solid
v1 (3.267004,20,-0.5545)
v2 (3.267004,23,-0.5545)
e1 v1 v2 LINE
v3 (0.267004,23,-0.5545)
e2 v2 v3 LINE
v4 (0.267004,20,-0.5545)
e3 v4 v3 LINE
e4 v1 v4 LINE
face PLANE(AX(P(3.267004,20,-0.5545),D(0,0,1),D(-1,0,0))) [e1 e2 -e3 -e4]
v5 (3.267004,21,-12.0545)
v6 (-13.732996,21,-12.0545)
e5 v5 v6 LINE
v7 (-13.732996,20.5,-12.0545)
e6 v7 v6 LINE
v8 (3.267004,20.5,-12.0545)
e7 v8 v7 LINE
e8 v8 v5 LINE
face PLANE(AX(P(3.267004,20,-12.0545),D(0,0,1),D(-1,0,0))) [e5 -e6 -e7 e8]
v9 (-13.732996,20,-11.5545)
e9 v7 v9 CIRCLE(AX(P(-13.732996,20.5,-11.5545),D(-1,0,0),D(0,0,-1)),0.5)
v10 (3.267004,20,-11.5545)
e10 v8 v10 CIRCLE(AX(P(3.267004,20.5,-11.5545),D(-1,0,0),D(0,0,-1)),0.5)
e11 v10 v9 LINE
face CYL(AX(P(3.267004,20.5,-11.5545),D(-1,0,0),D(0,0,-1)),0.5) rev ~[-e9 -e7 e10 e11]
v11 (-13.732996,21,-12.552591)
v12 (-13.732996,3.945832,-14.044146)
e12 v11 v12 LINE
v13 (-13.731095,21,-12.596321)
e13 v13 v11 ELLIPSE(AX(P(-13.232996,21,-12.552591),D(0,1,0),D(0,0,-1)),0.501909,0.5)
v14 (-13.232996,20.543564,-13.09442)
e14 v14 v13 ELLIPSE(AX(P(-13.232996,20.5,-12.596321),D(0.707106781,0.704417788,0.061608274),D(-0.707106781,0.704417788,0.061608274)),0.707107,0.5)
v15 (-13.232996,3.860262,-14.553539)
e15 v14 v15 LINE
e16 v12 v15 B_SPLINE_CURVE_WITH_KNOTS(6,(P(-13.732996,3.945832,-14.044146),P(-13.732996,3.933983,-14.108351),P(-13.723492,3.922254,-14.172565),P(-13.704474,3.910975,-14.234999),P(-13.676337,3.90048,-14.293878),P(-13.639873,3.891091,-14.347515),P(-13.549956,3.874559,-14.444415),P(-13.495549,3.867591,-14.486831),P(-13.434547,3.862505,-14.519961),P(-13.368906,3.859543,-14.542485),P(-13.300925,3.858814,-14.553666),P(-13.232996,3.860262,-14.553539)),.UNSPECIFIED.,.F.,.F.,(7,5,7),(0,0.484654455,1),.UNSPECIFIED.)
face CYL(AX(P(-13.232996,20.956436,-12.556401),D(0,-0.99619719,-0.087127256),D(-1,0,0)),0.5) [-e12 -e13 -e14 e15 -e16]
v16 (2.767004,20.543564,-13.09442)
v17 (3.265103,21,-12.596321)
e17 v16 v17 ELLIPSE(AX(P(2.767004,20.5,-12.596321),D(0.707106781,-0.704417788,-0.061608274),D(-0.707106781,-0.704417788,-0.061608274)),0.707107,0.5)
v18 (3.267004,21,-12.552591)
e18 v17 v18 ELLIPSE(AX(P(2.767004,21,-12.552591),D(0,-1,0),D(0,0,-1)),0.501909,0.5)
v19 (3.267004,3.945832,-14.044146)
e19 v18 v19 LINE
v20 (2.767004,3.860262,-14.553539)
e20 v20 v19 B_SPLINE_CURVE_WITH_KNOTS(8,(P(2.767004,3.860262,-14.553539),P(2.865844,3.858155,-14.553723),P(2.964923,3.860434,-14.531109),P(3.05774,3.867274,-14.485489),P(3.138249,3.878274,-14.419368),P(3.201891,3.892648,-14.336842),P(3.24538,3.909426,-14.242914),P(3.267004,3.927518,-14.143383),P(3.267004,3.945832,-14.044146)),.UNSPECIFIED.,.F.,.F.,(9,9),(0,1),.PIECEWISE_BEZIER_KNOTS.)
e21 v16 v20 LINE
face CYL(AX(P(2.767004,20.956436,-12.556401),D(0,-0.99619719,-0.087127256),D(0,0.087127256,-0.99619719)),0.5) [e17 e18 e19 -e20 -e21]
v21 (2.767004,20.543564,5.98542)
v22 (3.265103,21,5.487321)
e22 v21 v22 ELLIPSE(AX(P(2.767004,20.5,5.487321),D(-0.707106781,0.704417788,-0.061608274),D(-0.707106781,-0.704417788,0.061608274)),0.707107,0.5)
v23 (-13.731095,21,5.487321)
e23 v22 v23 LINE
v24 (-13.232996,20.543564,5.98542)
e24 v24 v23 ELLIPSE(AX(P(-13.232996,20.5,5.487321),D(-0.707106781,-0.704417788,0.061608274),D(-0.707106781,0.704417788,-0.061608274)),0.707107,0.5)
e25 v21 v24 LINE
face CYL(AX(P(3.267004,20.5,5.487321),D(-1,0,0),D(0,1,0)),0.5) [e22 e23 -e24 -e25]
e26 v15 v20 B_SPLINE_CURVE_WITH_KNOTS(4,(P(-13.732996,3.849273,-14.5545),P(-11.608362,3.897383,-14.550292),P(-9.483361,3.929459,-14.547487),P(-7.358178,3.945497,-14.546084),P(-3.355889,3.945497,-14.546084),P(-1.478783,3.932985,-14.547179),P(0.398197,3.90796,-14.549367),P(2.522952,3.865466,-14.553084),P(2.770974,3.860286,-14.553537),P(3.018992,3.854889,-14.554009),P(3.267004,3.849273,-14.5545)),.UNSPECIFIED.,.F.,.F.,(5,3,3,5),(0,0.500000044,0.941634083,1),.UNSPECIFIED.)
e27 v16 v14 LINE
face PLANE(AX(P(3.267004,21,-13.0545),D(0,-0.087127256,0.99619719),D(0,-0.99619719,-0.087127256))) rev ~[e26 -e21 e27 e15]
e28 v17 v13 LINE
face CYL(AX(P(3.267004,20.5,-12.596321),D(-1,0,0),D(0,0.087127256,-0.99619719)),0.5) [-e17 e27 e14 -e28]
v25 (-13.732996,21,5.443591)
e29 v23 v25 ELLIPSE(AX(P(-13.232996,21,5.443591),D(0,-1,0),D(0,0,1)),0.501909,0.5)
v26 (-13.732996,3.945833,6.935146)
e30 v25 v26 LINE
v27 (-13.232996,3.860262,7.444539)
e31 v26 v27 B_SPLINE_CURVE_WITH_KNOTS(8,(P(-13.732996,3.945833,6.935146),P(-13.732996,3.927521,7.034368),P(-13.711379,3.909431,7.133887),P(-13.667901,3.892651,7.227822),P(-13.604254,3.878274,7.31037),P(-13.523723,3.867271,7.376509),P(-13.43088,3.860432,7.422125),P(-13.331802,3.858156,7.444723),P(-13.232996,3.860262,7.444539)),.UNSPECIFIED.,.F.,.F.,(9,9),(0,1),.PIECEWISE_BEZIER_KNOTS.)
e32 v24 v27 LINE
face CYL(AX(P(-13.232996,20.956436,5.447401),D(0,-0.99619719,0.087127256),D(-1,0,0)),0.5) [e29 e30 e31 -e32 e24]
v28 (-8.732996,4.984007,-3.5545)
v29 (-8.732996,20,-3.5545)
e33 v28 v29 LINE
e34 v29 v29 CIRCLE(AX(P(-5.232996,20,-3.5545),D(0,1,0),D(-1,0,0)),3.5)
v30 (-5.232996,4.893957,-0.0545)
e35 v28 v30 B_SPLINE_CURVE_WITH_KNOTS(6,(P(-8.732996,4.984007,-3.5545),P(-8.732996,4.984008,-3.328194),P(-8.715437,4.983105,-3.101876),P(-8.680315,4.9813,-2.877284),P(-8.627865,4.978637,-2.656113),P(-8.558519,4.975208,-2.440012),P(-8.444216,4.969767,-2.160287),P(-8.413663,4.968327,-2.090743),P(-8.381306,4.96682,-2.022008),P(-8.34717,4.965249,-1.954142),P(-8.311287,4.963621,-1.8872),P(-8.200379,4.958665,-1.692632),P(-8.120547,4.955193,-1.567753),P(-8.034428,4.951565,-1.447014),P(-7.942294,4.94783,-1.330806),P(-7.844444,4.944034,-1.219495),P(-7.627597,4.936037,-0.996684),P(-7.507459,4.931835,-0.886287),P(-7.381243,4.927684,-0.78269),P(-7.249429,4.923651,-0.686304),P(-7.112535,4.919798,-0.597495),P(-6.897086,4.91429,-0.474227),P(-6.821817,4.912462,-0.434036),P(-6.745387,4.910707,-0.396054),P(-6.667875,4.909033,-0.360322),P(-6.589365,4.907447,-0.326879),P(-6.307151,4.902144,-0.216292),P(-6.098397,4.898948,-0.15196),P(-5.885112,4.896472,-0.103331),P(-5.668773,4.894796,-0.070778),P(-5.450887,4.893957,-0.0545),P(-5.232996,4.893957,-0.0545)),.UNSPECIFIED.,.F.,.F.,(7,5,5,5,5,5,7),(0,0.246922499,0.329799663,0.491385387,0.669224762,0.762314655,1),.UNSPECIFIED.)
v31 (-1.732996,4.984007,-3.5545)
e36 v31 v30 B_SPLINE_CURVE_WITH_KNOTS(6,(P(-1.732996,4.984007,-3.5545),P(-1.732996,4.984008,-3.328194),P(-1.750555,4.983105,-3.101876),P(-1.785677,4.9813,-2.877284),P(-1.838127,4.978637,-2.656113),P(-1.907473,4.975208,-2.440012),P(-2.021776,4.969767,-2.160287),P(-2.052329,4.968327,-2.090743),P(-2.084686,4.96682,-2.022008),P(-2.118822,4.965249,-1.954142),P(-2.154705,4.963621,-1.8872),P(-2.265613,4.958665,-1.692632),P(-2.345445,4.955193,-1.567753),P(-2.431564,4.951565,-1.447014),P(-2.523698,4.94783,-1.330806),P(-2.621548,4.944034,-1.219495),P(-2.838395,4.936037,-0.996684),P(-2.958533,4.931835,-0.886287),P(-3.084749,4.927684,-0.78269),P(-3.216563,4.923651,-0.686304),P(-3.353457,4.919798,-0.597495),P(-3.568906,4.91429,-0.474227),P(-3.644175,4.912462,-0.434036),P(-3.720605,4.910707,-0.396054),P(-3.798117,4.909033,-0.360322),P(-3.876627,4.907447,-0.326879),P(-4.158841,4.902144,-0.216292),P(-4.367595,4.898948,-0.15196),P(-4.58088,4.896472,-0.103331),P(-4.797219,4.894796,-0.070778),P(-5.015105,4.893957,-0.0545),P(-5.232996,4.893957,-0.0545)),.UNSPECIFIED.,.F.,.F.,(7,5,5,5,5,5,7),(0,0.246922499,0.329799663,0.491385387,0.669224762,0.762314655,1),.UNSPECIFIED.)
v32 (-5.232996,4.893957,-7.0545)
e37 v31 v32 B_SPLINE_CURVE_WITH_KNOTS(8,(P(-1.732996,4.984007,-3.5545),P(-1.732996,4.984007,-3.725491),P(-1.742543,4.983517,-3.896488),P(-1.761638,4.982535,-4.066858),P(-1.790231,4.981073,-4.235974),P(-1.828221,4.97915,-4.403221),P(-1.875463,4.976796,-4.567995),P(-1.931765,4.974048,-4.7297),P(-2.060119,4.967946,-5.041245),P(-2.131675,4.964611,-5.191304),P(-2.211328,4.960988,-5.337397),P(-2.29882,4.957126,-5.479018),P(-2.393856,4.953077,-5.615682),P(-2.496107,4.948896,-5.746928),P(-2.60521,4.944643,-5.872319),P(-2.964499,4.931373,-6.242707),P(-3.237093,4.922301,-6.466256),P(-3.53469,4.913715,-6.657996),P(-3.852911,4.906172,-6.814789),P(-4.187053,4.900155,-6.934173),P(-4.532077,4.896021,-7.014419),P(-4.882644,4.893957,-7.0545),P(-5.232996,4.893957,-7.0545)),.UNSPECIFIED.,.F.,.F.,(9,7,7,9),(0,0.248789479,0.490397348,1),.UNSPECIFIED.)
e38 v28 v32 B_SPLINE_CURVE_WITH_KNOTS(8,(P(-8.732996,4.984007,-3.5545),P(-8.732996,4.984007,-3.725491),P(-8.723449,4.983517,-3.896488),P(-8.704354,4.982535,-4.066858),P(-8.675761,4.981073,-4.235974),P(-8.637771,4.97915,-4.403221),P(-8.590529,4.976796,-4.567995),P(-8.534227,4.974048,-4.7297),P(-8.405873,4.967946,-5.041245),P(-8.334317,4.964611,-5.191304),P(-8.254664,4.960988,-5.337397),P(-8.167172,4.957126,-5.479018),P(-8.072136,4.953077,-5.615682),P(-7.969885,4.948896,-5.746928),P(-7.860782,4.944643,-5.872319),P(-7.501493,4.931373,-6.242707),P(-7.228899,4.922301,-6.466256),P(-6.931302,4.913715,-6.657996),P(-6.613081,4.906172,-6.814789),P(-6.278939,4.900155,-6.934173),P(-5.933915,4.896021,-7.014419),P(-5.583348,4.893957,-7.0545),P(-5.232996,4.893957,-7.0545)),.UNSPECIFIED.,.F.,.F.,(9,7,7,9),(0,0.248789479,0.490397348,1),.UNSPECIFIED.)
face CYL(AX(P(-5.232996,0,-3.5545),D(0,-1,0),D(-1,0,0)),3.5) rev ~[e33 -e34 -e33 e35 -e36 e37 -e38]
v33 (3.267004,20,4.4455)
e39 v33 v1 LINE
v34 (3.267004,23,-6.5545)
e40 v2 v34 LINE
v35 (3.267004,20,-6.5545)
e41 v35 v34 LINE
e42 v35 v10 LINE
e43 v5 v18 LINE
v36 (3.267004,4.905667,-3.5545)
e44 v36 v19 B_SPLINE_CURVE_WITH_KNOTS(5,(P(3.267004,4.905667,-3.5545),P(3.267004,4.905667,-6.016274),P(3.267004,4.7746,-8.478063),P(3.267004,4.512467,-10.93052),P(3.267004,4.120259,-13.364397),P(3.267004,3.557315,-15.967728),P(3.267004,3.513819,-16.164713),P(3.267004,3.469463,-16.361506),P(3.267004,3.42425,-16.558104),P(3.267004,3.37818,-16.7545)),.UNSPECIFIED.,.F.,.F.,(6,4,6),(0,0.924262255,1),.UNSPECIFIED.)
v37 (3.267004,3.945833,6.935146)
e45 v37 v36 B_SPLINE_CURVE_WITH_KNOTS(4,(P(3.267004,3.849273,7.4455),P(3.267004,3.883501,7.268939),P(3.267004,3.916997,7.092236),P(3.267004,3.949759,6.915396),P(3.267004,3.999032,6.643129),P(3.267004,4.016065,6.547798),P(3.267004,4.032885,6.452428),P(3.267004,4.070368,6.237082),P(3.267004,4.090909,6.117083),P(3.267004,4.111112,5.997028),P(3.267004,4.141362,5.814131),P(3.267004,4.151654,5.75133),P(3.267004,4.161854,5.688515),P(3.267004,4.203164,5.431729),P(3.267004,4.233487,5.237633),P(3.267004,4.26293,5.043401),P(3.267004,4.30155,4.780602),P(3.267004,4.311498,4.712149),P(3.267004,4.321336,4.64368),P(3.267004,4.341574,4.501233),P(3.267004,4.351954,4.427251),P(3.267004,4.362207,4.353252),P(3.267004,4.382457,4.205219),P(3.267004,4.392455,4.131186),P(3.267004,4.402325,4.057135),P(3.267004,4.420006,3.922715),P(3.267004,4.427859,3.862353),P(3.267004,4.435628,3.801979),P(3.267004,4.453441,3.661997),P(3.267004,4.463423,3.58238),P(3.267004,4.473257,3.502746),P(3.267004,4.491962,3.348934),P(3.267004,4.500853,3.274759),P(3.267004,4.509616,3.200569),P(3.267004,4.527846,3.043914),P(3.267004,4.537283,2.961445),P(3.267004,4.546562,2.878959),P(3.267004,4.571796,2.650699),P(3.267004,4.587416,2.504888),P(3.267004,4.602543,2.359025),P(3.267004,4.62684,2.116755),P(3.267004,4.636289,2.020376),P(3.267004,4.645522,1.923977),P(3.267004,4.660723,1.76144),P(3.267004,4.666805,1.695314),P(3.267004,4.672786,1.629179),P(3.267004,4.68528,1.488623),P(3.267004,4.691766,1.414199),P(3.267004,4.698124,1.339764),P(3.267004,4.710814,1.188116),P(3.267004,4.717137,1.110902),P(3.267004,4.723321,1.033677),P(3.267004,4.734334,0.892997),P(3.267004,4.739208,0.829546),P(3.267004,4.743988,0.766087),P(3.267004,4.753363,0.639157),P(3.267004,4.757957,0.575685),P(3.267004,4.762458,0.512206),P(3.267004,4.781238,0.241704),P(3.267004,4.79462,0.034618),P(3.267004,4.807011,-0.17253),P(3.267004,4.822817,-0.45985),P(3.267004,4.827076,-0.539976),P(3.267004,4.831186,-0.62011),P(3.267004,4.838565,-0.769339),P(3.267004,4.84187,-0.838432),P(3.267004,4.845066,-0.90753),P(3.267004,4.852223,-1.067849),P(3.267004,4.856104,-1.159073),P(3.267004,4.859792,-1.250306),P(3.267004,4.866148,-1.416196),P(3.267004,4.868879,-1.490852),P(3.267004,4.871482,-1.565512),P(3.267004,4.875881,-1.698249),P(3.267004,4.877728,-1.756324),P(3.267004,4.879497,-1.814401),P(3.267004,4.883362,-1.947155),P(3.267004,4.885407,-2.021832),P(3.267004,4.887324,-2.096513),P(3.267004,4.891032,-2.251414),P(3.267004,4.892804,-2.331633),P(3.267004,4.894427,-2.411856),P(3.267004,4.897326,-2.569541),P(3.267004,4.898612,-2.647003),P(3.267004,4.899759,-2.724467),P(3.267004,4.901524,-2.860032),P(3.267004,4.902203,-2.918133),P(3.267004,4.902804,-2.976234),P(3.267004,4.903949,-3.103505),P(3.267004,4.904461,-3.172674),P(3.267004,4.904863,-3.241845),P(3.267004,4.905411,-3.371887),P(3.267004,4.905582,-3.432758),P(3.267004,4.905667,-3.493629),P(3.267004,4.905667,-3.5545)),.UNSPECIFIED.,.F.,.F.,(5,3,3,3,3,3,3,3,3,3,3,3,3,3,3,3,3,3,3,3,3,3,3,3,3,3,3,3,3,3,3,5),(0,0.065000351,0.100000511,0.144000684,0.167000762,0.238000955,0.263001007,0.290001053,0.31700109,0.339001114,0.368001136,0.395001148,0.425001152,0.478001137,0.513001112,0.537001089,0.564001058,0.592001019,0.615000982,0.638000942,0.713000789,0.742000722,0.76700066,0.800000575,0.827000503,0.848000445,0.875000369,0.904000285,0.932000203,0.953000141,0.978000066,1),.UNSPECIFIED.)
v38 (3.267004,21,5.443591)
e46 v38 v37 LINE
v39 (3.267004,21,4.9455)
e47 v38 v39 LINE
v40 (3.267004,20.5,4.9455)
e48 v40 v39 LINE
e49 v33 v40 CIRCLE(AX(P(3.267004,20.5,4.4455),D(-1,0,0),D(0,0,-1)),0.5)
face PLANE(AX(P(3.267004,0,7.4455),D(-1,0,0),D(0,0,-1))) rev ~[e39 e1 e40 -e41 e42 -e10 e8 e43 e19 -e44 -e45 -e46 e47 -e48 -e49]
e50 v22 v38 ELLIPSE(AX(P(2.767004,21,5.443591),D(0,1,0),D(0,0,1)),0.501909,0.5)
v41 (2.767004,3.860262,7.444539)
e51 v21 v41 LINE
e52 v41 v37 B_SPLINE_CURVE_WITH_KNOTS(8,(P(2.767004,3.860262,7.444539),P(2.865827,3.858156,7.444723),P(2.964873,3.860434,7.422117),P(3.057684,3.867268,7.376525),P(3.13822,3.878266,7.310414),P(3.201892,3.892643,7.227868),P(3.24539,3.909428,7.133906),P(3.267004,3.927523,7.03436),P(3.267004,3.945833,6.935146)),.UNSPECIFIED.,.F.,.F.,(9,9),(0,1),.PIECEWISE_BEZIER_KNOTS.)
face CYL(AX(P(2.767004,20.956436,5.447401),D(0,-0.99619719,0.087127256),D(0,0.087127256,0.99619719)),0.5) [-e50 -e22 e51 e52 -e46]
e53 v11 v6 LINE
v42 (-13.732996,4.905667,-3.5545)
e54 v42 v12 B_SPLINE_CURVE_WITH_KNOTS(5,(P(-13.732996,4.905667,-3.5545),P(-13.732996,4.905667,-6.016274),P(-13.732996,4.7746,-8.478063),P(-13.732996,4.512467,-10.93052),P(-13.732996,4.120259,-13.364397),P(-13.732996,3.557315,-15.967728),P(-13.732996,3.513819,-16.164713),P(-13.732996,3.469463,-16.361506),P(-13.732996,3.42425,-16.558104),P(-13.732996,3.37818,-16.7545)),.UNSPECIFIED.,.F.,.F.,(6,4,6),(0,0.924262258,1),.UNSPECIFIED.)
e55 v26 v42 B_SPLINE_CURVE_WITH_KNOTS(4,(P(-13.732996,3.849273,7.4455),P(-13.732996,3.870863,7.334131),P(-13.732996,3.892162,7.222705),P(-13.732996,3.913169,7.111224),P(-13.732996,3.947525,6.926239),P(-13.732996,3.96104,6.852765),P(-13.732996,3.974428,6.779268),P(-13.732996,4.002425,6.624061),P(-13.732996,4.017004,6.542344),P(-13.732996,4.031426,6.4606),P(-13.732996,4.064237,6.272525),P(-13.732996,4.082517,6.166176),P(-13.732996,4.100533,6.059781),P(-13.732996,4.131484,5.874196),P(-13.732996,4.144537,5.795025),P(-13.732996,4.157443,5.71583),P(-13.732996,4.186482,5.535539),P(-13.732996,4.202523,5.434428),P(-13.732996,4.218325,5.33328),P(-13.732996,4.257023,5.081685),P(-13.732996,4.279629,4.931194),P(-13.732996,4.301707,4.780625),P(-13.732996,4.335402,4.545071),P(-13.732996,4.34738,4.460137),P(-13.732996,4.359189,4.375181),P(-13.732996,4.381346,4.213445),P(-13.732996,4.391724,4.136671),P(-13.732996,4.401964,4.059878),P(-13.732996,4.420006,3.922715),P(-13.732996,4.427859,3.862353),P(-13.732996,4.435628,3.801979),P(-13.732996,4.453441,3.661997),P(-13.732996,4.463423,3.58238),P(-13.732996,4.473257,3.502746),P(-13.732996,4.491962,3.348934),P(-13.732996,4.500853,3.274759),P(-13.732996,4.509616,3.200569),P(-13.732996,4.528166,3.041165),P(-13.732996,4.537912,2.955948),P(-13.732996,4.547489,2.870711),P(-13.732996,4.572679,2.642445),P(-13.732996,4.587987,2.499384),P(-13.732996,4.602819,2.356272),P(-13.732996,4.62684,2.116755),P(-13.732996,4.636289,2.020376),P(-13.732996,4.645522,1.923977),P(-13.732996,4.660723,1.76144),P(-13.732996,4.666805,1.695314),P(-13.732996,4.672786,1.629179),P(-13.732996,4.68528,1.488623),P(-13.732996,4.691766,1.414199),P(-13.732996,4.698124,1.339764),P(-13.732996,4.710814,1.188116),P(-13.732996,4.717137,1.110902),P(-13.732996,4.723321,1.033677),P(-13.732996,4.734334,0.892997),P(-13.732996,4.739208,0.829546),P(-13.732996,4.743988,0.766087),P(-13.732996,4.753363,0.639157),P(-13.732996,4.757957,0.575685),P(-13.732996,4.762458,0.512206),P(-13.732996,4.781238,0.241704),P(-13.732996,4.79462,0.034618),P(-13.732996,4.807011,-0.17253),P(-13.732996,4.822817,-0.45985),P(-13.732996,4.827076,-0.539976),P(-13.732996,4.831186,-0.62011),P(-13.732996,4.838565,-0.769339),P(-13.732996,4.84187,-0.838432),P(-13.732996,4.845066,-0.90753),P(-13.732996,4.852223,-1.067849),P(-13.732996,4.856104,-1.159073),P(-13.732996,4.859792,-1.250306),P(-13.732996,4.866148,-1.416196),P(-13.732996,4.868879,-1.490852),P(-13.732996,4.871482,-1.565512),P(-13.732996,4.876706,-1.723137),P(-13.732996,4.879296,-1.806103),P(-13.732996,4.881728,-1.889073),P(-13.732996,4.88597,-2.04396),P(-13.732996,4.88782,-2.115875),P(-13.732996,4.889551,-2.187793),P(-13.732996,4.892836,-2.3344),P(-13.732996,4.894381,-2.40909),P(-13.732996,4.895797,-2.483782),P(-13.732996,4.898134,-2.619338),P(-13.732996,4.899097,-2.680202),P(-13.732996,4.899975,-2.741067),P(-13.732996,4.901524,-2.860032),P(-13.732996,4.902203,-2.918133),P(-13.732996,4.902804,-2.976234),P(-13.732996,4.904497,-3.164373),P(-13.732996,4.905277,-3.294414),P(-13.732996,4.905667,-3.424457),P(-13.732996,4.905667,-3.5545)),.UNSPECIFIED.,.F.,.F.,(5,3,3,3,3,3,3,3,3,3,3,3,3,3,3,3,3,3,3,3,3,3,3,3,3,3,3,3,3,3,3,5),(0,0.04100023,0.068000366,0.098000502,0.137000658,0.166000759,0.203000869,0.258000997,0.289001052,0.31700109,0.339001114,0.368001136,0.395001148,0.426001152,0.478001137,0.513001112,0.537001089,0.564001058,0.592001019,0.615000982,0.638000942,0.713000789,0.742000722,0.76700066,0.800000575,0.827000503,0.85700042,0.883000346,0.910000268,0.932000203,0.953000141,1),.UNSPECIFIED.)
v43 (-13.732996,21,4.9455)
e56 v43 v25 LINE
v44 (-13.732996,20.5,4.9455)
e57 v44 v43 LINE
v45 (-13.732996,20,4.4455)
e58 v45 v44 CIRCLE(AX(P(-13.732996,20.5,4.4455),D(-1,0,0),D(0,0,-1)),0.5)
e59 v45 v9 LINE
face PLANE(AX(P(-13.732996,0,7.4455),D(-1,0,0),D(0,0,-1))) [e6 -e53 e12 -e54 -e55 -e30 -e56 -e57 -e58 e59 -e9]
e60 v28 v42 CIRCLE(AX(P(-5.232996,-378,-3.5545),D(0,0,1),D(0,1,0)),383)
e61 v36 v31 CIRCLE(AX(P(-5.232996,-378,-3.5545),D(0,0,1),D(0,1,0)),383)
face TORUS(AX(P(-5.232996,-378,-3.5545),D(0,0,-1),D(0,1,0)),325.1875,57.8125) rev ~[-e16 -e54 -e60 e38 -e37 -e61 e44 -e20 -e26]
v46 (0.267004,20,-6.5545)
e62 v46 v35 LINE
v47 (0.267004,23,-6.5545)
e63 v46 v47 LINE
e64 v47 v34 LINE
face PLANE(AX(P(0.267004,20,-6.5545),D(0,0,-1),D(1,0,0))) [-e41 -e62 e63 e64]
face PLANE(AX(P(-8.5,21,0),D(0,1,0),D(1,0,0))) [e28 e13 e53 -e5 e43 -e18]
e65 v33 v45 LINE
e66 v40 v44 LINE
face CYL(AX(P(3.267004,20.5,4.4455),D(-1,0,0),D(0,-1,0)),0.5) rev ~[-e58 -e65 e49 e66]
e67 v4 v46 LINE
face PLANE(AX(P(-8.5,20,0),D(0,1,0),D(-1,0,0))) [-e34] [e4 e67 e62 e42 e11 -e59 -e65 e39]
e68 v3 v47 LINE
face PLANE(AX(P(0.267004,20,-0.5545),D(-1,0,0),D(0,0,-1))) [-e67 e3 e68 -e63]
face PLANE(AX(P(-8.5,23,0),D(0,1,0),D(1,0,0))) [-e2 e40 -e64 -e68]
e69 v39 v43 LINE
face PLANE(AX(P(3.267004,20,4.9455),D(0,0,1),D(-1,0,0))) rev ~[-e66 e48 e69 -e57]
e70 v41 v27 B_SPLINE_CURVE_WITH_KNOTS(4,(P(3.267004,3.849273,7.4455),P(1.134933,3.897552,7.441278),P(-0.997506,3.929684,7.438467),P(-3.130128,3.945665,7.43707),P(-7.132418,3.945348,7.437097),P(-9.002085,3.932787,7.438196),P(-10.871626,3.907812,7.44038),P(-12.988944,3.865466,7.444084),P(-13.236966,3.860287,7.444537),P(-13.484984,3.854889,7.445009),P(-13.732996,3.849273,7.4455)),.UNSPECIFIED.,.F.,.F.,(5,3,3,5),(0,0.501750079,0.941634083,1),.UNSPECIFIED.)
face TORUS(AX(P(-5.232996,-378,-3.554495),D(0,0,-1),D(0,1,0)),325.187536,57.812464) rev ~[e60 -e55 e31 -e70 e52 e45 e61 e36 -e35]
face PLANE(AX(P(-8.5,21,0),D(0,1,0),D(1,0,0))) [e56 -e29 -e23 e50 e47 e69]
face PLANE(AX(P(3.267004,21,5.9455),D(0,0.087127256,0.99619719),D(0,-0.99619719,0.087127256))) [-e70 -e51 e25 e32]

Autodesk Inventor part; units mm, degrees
ref_plane "YZ Plane" through (0, 0, 0) normal (1, 0, 0) x (0, 1, 0)
ref_plane "XZ Plane" through (0, 0, 0) normal (0, 1, 0) x (-1, 0, 0)
ref_plane "XY Plane" through (0, 0, 0) normal (0, 0, 1) x (1, 0, 0)
sketch "Sketch1" plane through (0, 0, 0) normal (0, 1, 0) x (-1, 0, 0)
  line L0 (5.232996, 7.4455) -> (-11.767004, 7.4455)
  line L1 (-11.767004, 7.4455) -> (-11.767004, -14.5545)
  line L2 (-11.767004, -14.5545) -> (5.232996, -14.5545)
  circle A0 centre (-3.267004, -3.5545) radius 3.5
  line L3 (5.232996, 7.4455) -> (5.232996, -14.5545)
  point P0 (0, 0)
  dimension "d2" = 22
  dimension "d3" = 17
  dimension "d8" = 7
  dimension "d10" = 11
  dimension "d11" = 8.5
extrude "Extrusion1" add sketch "Sketch1" along normal blind 20
sketch "Sketch2" plane through (0, 20, 0) normal (0, 1, 0) x (1, 0, 0)
  line L0 (-5.232996, -7.4455) -> (11.767004, -7.4455)
  line L1 (11.767004, -7.4455) -> (11.767004, 14.5545)
  line L2 (-5.232996, -7.4455) -> (11.767004, -7.4455)
  line L3 (11.767004, -7.4455) -> (11.767004, -4.9455)
  line L4 (11.767004, -4.9455) -> (-5.232996, -4.9455)
  line L5 (-5.232996, -4.9455) -> (-5.232996, -7.4455)
  line L6 (-5.232996, 14.5545) -> (-5.232996, -7.4455)
  line L7 (-5.232996, 14.5545) -> (11.767004, 14.5545)
  line L8 (11.767004, 14.5545) -> (11.767004, 12.0545)
  line L9 (11.767004, 12.0545) -> (-5.232996, 12.0545)
  line L10 (-5.232996, 12.0545) -> (-5.232996, 14.5545)
  line L11 (11.767004, 0.5545) -> (8.767004, 0.5545)
  line L12 (8.767004, 0.5545) -> (8.767004, 6.5545)
  line L13 (8.767004, 6.5545) -> (11.767004, 6.5545)
  line L14 (11.767004, 6.5545) -> (11.767004, 0.5545)
  line L15 (11.767004, 0.5545) -> (8.767004, 0.5545)
  line L16 (8.767004, 0.5545) -> (8.767004, 6.5545)
  line L17 (8.767004, 6.5545) -> (11.767004, 6.5545)
  line L18 (11.767004, 6.5545) -> (11.767004, 0.5545)
  point P0 (0, 0)
  dimension "d14" = 2.5
  dimension "d15" = 2.5
  dimension "d16" = 3
  dimension "d17" = 6
  dimension "d18" = 8
extrude "Extrusion2" add sketch "Sketch2" along normal blind 1 contours L5 L4 L1 L0 | L6 L7 L1 L9
sketch "Sketch3" plane through (0, 20, 0) normal (0, 1, 0) x (1, 0, 0)
  line L0 (11.767004, -4.9455) -> (11.767004, 12.0545)
  line L1 (11.767004, 0.5545) -> (8.767004, 0.5545)
  line L2 (8.767004, 0.5545) -> (8.767004, 6.5545)
  line L3 (8.767004, 6.5545) -> (11.767004, 6.5545)
  line L4 (11.767004, 6.5545) -> (11.767004, 0.5545)
  line L5 (-5.232996, -7.4455) -> (11.767004, -7.4455)
  point P0 (0, 0)
  dimension "d21" = 6
  dimension "d22" = 3
  dimension "d23" = 8
extrude "Extrusion3" add sketch "Sketch3" along normal blind 3
sketch "Sketch5" plane through (-5.232996, 0, -14.5545) normal (-1, 0, 0) x (0, 0, 1)
  line L0 (-21.5, -5) -> (43.5, -5)
  line L1 (11, -5) -> (11, 5)
  line L2 (0, 0) -> (0, 21)
  arc A0 (43.5, -5) -> (22, 3.943867) centre (11, -52.8125) ccw
  line L3 (2.5, 20) -> (19.5, 20)
  arc A1 (11, 5) -> (-21.5, -5) centre (11, -52.8125) ccw
  arc A2 (0, 3.943867) -> (-21.5, -5) centre (11, -52.8125) ccw
  line L4 (0, 0) -> (22, 0)
  line L5 (22, 0) -> (22, 3.943867)
  line L6 (22, 0) -> (0, 0)
  line L7 (0, 0) -> (0, 3.943867)
  arc A3 (22, 3.943867) -> (11, 5) centre (11, -52.8125) ccw
  line L8 (-15.777391, -378) -> (53.366362, -378)
  point P0 (14.5545, 0)
  dimension "d27" = 65
  dimension "d28" = 10
  dimension "d29" = 32.5
  dimension "d30" = 21.5
  dimension "d31" = 15
  dimension "d32" = 373
move or copy body "Move Body1" bodies to move or copy 1 copy no translate (-8.5, 0, 0)
revolve "Revolution1" cut sketch "Sketch5" angle 360 about axis through (-5.232996, -378, -30.331891) along (0, 0, 1)
fillet "Fillet2" radius 0.5 1 edges at (-5.233, 20, -12.0545)
fillet "Fillet3" radius 0.5 1 edges at (-5.233, 20, 4.9455)
sketch "Sketch6" plane through (3.267004, 21, -12.0545) normal (1, 0, 0) x (0, 0, -1)
  line L0 (-17, 0) -> (-19.5, 0)
  line L1 (-17, 0) -> (-18, 0)
  line L2 (-19.5, -17.150727) -> (-19.5, 0)
  line L3 (-18, 0) -> (-19.5, -17.150727)
  line L4 (-19.5, -17.150727) -> (-19.5, 0)
  line L5 (-19.5, 0) -> (-18, 0)
  line L6 (0, 0) -> (2.5, 0)
  line L7 (0, 0) -> (1, 0)
  line L8 (2.5, -17.150727) -> (2.5, 0)
  line L9 (1, 0) -> (2.5, -17.150727)
  line L10 (2.5, -17.150727) -> (2.5, 0)
  line L11 (2.5, 0) -> (1, 0)
  point P0 (-12.0545, -21)
  dimension "d40" = 1
  dimension "d41" = 1
extrude "Extrusion4" cut sketch "Sketch6" against normal up to next
fillet "Fillet4" radius 0.5 6 edges at (-5.233, 21, 5.9455) (3.267, 12.4246, 6.6955) (-13.733, 12.4246, 6.6955) (3.267, 12.4246, -13.8045) (-5.233, 21, -13.0545) (-13.733, 12.4246, -13.8045)
properties part number "upper_fender_spacer"
